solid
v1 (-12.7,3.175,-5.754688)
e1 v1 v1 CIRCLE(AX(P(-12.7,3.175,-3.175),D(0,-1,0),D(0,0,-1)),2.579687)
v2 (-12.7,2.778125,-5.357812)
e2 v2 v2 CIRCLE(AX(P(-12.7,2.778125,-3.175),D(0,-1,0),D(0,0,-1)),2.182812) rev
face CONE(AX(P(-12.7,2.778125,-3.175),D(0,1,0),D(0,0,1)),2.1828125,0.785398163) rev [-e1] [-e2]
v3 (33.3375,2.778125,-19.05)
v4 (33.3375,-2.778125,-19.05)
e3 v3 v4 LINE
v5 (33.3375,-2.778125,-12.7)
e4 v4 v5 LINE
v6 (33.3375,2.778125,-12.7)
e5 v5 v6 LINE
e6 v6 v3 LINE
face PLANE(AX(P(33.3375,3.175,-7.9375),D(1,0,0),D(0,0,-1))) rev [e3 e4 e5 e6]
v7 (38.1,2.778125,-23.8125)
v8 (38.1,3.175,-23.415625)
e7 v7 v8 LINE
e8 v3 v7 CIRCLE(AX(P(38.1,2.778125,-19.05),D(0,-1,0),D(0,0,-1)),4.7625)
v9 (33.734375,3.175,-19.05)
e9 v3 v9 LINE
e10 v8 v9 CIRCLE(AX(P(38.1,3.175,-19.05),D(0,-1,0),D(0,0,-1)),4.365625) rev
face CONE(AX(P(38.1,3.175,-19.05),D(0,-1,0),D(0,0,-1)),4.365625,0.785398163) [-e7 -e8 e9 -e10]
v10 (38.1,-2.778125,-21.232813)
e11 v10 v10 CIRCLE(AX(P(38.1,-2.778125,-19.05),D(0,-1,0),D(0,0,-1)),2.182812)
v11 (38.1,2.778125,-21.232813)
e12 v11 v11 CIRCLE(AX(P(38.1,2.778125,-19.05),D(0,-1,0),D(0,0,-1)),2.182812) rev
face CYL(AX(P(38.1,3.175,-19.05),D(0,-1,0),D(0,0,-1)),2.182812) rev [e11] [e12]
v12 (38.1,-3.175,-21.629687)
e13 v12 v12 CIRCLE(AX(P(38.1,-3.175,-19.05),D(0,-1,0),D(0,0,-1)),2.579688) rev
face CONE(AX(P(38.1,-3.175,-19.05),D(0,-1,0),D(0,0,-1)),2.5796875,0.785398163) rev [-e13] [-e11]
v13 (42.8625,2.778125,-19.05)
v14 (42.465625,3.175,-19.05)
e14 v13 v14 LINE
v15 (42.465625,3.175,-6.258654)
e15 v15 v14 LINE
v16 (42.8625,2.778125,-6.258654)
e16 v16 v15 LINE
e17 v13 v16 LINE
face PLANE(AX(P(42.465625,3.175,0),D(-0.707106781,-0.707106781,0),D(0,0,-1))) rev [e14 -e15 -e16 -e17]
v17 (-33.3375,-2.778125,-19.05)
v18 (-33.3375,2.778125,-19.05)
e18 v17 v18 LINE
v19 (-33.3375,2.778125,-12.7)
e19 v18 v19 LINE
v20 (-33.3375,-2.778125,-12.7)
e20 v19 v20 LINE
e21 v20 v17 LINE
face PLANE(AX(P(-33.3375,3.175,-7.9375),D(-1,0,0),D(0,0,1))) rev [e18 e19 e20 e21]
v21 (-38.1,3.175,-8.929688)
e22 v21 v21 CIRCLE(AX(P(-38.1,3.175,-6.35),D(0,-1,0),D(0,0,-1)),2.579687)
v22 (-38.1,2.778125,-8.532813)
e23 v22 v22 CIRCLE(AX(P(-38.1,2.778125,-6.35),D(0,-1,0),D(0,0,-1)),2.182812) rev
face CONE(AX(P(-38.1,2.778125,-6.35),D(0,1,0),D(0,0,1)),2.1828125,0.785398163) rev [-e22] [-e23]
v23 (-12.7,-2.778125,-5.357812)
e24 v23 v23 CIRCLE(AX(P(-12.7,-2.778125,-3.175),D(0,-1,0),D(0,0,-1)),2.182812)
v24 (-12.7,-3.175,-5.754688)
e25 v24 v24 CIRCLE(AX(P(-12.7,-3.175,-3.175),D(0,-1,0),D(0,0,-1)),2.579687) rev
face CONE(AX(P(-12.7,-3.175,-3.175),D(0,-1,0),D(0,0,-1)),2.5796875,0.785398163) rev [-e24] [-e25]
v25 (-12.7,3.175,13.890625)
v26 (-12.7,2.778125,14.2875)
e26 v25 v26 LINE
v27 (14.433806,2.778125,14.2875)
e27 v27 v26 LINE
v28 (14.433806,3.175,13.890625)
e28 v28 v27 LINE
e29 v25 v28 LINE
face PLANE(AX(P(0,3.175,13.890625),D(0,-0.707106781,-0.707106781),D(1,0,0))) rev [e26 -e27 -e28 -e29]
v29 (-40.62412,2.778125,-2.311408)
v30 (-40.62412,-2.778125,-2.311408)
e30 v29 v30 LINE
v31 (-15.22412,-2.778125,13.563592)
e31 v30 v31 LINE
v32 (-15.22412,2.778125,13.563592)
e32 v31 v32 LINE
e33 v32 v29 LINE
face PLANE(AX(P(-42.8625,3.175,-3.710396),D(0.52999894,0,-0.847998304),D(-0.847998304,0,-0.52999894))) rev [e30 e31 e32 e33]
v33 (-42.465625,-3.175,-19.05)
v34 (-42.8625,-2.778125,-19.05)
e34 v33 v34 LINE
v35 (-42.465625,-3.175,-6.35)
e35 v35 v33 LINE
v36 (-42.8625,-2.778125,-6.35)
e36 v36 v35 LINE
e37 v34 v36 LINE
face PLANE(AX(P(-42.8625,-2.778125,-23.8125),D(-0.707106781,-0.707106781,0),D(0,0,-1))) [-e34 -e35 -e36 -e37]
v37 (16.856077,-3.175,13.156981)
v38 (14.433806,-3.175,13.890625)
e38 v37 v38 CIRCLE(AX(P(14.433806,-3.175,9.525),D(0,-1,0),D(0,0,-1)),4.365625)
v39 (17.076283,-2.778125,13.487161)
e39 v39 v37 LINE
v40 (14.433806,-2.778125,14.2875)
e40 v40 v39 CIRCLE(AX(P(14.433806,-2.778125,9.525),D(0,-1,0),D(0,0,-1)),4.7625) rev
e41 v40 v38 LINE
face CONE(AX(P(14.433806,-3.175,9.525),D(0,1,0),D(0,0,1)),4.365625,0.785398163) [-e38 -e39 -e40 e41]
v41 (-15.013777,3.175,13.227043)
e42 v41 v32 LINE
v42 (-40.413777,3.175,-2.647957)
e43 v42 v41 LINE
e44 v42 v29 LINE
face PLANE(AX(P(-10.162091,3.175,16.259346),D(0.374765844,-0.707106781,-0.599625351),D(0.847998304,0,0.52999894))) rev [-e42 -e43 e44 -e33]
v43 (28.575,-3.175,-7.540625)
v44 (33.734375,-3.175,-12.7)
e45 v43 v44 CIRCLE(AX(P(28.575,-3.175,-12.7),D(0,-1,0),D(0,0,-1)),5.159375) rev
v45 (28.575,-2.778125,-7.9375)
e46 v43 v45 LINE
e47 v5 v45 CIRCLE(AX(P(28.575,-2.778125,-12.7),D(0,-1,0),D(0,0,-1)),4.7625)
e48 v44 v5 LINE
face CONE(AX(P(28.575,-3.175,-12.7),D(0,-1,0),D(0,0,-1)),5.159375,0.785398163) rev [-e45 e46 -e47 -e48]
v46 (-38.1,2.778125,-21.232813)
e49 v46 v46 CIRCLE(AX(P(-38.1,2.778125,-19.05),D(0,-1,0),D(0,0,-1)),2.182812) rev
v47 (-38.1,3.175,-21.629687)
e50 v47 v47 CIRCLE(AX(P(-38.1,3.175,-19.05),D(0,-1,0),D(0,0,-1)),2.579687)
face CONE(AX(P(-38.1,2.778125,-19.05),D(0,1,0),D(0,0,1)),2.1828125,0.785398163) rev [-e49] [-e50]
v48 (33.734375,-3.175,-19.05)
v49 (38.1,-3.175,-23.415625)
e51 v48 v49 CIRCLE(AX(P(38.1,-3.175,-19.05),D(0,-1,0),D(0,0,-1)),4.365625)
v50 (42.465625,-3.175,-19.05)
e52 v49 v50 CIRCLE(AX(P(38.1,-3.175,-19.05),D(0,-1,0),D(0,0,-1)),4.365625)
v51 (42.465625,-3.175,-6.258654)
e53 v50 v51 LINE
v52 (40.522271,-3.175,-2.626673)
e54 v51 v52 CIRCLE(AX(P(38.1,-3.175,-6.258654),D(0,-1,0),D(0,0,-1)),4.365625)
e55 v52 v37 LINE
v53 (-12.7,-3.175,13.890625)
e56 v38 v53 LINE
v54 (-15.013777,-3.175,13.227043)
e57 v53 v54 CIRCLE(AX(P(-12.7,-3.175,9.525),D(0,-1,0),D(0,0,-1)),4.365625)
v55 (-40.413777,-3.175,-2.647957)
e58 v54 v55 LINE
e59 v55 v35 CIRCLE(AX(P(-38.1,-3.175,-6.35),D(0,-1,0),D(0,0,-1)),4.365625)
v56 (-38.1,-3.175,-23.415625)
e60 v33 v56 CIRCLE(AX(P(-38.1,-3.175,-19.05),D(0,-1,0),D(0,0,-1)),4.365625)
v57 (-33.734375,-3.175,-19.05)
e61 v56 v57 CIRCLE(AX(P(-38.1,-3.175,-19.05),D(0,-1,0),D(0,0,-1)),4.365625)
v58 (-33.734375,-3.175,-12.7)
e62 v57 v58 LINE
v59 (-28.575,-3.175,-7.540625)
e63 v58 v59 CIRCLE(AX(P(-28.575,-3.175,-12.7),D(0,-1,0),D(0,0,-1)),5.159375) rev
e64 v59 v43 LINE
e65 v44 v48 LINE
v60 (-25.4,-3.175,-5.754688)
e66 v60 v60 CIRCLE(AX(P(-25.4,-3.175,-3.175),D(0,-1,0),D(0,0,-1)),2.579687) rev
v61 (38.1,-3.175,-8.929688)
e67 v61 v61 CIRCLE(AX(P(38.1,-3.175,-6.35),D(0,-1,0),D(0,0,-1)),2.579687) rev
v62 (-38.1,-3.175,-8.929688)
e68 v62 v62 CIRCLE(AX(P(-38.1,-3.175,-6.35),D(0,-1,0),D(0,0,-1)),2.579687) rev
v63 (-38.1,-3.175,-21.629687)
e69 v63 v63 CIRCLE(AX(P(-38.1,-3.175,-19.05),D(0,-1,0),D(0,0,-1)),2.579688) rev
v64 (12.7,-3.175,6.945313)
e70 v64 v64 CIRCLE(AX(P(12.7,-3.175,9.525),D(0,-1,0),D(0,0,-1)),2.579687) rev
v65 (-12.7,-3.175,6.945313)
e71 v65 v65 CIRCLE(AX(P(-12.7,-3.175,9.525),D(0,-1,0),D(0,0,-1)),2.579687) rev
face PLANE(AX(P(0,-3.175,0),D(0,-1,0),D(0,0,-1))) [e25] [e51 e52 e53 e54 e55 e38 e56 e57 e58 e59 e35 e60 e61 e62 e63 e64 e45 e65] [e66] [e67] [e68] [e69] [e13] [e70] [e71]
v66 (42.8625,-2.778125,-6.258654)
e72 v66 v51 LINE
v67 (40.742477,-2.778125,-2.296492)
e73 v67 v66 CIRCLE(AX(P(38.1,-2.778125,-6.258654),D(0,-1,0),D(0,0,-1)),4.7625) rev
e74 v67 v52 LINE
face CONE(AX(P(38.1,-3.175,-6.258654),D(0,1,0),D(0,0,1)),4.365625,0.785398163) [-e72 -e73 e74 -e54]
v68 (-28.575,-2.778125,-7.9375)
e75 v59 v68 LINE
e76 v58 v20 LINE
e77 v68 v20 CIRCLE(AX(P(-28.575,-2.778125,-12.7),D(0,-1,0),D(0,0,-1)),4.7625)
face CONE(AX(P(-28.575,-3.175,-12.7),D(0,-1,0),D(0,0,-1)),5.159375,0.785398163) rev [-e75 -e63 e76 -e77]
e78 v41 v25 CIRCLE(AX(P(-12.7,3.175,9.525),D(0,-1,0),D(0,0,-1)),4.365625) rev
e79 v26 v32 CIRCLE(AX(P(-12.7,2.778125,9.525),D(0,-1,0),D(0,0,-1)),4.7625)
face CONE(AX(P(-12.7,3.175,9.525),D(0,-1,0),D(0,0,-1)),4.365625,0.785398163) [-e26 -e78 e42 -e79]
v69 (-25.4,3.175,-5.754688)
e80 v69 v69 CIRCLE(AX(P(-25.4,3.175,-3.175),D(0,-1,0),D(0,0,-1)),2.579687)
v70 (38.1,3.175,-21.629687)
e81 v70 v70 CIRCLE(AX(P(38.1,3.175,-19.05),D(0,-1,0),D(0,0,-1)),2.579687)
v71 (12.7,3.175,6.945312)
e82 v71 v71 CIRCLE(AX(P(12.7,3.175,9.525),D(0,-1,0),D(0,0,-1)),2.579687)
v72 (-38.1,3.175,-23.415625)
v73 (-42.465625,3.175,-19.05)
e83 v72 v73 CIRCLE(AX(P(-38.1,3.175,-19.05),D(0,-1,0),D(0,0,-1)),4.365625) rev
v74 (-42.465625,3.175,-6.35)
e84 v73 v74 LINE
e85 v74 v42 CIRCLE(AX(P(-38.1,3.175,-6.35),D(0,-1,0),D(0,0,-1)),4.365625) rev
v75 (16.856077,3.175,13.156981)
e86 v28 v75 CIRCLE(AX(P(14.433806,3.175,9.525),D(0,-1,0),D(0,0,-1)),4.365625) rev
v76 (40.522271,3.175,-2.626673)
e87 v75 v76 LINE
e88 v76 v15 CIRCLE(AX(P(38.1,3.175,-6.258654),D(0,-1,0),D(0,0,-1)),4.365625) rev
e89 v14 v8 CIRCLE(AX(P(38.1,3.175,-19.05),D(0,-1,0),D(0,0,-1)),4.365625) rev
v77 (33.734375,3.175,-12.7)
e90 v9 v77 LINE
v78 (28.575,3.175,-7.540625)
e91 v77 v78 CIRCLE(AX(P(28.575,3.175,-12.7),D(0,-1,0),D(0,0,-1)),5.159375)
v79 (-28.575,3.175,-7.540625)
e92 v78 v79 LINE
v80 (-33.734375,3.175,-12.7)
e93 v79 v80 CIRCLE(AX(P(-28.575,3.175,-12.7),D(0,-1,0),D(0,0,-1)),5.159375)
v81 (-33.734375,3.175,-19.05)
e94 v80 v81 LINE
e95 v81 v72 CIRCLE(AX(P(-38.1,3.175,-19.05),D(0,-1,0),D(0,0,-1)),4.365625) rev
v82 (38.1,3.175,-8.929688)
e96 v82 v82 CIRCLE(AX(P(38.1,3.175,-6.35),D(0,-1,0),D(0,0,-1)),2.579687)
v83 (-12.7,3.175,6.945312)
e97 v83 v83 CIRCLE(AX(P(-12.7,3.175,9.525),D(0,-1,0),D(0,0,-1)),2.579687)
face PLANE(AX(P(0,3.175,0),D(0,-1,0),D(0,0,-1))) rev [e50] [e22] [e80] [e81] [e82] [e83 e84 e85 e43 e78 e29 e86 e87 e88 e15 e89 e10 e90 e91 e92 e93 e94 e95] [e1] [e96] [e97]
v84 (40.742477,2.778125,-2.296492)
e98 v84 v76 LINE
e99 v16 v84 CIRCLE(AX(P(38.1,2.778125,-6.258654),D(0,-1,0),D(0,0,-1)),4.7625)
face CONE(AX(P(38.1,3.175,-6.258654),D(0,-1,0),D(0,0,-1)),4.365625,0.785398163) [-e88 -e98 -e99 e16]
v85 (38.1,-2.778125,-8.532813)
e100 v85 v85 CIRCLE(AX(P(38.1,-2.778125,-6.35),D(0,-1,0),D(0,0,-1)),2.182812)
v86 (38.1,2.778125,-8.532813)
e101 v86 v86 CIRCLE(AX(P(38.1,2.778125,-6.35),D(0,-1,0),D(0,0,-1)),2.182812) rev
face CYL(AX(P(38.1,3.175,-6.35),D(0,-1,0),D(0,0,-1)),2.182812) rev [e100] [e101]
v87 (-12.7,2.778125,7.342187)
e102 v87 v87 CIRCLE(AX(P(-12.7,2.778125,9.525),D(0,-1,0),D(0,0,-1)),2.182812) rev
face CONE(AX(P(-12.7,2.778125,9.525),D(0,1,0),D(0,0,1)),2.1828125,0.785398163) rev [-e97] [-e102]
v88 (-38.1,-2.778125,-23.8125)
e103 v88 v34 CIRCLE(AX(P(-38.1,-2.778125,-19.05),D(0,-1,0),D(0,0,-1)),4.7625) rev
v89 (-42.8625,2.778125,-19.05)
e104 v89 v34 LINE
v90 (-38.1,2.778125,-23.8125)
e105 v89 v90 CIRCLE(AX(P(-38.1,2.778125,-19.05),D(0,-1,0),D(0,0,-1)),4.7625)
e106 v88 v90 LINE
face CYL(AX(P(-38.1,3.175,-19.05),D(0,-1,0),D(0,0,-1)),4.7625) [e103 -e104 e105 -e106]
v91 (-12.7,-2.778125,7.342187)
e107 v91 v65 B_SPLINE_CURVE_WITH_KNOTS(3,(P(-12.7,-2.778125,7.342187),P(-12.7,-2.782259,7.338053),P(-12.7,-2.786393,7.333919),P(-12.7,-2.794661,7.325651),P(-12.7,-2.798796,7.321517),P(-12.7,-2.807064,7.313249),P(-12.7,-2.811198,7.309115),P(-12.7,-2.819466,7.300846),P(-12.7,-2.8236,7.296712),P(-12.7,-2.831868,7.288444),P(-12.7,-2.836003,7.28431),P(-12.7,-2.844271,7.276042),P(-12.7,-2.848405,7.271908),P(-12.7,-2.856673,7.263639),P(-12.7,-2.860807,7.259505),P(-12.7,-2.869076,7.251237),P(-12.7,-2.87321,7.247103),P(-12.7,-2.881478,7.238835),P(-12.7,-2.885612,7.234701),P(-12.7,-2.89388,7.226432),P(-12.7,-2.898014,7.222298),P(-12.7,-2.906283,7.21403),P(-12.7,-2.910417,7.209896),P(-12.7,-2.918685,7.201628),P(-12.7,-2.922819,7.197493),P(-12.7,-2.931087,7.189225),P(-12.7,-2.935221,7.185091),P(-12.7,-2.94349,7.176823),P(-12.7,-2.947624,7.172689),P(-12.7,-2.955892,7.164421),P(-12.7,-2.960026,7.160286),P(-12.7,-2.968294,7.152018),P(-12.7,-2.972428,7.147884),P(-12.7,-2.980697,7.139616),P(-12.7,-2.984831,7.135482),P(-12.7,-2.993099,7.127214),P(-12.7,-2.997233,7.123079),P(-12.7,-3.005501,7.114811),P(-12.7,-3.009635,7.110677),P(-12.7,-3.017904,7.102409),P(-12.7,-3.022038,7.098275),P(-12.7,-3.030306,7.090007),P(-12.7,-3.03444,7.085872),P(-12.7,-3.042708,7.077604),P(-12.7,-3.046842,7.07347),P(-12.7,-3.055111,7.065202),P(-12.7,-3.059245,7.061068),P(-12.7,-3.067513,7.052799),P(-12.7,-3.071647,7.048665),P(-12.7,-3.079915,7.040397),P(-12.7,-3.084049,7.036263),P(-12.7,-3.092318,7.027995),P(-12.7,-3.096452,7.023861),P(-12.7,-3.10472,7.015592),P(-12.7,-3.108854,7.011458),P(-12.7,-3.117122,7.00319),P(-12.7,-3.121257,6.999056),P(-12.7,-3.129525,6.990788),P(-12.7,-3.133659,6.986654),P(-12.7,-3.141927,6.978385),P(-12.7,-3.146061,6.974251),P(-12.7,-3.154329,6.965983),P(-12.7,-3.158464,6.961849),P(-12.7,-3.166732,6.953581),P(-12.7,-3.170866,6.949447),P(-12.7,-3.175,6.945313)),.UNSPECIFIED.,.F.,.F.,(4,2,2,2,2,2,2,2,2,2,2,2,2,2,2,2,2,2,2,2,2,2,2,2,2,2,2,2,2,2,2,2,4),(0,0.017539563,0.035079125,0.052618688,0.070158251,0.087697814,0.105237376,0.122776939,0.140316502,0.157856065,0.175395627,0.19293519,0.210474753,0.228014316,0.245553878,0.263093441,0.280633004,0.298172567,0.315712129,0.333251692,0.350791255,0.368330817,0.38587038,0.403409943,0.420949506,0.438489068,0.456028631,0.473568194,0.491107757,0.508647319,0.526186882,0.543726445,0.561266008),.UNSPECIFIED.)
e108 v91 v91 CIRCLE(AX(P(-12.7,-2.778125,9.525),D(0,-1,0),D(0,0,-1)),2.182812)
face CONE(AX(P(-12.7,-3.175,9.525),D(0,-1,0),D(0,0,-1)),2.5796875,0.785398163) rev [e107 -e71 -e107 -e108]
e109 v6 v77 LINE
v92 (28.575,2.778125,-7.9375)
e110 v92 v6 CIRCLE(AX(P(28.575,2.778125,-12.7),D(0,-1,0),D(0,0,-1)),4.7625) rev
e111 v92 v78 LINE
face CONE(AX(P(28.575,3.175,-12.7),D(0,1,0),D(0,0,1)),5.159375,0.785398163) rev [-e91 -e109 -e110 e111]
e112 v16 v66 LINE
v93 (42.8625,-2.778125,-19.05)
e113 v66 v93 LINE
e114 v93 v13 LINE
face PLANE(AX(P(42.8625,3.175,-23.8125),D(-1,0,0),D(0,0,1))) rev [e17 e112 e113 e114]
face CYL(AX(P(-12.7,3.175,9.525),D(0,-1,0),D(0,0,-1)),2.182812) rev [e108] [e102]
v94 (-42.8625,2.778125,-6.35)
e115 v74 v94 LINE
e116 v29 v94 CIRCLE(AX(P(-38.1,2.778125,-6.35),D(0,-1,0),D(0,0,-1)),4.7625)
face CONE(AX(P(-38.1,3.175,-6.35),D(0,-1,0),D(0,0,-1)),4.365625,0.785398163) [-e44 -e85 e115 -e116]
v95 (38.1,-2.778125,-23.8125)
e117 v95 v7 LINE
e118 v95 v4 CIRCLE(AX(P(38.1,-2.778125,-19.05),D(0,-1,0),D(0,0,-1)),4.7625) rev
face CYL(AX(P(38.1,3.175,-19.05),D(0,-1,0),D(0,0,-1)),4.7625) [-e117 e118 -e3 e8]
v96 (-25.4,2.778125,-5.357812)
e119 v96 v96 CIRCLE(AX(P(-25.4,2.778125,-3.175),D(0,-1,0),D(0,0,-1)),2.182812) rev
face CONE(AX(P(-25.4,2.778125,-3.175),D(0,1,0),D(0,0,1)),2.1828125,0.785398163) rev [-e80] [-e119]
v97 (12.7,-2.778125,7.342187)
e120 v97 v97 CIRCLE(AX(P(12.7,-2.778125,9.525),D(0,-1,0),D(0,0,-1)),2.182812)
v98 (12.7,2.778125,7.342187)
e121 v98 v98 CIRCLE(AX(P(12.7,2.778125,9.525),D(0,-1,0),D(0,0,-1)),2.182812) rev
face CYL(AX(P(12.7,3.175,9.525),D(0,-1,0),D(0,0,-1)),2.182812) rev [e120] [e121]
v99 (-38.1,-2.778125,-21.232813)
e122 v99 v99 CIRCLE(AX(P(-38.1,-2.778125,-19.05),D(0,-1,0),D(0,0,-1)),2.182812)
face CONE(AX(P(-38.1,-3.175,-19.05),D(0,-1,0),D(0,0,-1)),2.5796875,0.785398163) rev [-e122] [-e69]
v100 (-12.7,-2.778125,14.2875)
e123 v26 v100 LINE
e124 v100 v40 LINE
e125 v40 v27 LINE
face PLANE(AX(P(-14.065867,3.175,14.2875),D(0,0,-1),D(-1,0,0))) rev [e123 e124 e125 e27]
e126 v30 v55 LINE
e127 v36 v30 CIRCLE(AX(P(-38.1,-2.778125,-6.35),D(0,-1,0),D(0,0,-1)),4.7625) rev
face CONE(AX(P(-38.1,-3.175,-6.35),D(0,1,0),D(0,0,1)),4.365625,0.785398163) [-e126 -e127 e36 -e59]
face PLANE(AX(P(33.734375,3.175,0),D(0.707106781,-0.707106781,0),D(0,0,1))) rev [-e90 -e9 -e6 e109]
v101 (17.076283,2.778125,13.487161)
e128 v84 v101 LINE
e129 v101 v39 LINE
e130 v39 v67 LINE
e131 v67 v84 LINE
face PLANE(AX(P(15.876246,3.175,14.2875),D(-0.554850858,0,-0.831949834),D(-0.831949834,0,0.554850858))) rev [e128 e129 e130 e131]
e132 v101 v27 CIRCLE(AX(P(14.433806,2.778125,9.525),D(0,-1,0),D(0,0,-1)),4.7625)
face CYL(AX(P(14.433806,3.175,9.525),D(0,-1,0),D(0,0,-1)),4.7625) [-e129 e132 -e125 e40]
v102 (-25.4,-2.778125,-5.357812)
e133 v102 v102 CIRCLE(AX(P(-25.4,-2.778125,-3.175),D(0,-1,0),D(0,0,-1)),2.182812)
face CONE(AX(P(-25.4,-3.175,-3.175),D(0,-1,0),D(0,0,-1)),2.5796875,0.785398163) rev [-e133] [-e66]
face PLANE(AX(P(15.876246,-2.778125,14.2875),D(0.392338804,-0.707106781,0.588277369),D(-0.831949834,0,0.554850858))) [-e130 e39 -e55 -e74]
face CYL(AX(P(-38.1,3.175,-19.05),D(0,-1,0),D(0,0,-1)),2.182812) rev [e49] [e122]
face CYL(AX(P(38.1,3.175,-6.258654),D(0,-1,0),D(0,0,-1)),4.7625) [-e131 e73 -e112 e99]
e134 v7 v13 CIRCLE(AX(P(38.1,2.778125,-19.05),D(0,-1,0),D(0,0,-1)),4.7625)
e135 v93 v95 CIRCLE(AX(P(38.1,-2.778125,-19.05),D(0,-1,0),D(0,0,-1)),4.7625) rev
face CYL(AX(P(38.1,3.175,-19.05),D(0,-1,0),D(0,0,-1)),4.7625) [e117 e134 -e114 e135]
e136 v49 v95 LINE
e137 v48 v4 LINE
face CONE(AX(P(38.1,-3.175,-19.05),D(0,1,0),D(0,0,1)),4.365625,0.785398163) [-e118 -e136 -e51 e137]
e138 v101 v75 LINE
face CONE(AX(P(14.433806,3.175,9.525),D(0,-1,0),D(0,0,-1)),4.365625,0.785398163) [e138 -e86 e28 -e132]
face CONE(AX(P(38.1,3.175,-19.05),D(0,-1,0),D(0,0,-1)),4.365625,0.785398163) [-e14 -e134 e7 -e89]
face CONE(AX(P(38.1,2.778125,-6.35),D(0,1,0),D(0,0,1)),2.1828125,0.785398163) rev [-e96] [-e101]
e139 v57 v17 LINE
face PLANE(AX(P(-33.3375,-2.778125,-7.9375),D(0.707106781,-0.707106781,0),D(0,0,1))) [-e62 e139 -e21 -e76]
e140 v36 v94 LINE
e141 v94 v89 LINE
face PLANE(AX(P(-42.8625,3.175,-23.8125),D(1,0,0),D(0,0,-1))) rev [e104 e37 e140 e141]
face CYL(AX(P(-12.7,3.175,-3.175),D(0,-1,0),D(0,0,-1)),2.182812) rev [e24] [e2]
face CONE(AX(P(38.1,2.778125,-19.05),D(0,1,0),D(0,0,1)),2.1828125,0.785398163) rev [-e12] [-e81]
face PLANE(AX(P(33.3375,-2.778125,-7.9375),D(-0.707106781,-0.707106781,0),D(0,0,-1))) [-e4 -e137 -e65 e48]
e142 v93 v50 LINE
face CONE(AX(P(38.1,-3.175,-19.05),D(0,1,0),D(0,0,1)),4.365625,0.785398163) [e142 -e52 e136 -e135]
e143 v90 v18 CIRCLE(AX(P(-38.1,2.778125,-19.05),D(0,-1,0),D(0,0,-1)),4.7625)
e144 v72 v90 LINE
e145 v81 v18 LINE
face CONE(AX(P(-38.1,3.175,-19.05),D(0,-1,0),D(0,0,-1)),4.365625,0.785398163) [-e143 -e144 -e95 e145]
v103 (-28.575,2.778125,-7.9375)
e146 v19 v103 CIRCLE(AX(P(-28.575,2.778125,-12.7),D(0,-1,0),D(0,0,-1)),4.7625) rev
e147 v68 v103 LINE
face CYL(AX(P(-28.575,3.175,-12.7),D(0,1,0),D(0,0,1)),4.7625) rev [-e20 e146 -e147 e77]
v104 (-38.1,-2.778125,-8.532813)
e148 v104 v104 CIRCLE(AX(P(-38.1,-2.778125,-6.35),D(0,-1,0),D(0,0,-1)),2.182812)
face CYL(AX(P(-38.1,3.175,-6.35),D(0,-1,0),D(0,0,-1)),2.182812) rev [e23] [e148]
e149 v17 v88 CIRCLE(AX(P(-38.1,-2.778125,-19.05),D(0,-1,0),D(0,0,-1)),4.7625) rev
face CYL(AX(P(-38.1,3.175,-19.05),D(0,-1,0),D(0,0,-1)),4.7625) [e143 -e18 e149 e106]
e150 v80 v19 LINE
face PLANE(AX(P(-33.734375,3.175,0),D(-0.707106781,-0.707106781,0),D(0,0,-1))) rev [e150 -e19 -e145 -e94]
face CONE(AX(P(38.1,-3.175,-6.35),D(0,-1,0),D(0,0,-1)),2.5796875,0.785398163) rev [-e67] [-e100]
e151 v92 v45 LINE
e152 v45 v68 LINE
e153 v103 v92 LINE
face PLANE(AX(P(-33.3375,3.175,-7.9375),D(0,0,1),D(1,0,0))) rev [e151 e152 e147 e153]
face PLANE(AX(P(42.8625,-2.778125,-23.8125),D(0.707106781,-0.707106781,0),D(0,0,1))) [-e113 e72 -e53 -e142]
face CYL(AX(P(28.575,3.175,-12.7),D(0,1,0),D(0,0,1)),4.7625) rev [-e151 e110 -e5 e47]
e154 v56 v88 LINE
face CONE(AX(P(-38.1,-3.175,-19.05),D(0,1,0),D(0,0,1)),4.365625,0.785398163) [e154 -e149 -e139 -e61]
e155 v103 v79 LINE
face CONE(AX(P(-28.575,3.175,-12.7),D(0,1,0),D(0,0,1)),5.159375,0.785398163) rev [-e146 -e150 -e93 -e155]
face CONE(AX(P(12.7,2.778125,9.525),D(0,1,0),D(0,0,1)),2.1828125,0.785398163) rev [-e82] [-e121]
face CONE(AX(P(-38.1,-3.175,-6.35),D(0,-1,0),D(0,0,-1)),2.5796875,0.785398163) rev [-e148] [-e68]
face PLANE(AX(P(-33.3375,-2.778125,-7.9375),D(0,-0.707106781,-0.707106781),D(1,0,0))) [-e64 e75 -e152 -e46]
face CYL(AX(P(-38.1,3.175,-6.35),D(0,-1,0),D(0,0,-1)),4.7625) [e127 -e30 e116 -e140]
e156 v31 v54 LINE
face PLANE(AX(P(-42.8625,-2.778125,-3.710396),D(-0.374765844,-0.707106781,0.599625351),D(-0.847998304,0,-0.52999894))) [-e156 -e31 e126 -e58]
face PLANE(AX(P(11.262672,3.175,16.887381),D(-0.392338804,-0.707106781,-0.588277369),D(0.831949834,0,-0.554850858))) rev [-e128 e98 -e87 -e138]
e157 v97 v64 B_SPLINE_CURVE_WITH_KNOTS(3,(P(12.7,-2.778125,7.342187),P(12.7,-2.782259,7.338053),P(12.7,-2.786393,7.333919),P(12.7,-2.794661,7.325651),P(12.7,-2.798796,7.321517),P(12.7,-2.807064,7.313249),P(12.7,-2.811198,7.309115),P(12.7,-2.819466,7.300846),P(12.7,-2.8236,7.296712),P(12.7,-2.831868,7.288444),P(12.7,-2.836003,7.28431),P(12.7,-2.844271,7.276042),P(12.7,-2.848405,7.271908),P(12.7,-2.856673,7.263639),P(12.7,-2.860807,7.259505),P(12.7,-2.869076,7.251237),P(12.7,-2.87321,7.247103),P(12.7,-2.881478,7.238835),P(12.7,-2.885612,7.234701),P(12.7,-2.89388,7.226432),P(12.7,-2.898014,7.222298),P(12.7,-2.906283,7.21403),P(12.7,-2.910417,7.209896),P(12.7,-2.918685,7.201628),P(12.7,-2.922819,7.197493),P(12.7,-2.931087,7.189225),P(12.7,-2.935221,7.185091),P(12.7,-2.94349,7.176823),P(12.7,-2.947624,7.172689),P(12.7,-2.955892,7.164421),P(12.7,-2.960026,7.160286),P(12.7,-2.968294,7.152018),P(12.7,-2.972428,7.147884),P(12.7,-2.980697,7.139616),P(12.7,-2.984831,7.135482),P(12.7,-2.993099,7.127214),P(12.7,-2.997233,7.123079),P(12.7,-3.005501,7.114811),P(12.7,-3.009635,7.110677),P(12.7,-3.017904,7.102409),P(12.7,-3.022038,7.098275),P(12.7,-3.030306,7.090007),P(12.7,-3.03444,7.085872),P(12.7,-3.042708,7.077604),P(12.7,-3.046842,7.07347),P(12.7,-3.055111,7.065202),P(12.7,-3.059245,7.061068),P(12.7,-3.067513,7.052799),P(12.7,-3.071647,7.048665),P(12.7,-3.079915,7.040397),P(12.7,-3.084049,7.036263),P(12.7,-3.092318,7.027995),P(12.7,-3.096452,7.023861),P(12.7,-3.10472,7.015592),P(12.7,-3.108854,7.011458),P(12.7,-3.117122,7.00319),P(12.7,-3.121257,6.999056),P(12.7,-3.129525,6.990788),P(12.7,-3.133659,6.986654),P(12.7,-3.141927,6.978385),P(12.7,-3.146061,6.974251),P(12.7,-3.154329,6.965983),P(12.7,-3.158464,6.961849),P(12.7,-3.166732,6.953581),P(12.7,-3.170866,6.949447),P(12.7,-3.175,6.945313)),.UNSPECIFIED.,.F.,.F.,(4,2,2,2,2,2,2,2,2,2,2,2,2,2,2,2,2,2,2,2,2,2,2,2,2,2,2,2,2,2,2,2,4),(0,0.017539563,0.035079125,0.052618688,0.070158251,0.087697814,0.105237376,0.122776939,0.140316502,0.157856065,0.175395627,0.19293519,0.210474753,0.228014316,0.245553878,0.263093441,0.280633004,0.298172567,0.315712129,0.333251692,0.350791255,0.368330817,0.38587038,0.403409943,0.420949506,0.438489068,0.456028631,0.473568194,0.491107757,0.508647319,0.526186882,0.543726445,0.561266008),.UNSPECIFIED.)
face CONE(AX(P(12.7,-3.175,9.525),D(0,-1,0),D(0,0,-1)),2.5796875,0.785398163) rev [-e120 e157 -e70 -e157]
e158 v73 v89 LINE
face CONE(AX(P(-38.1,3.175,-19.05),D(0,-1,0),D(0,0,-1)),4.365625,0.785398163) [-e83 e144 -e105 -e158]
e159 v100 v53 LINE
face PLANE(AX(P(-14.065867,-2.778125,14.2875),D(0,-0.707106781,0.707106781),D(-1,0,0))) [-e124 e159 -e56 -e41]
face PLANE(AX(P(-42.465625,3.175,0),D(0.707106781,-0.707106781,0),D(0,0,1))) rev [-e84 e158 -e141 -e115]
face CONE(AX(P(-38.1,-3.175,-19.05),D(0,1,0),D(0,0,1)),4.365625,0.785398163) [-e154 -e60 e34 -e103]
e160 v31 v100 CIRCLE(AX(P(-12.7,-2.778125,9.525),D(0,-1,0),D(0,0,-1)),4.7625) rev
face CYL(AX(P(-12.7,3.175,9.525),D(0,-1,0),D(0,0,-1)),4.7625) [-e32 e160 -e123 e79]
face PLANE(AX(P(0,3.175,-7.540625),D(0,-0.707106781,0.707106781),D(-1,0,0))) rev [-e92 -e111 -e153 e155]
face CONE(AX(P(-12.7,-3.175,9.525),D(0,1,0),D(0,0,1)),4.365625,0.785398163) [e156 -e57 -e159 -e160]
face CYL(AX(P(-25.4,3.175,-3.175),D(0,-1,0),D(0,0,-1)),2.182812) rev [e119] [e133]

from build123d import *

# Parameters (mm, degrees)
SKETCH1_R           = 2.1828125
BOSS_EXTRUDE1_DEPTH = 3.175
FILLET1_R           = 4.7625
CHAMFER1_SIZE       = 0.396875


with BuildPart() as part:
    # Sketch1 → Boss-Extrude1 (new, symmetric)
    with BuildSketch(Plane(origin=(0, 0, 0), x_dir=(1, 0, 0), z_dir=(0, 1, 0))):
        Polygon((-33.3375, 7.9375), (-33.3375, 23.8125), (-42.8625, 23.8125), (-42.8625, 3.710395607), (-14.065867028, -14.2875), (15.876245853, -14.2875), (42.8625, 3.710395607), (42.8625, 23.8125), (33.3375, 23.8125), (33.3375, 7.9375), align=None)
        with Locations(Location((-38.1, 6.35, 0), (0, 0, 270))):
            Circle(SKETCH1_R, mode=Mode.SUBTRACT)
        with Locations(Location((-38.1, 19.05, 0), (0, 0, 270))):
            Circle(SKETCH1_R, mode=Mode.SUBTRACT)
        with Locations(Location((38.1, 19.05, 0), (0, 0, 270))):
            Circle(SKETCH1_R, mode=Mode.SUBTRACT)
        with Locations(Location((38.1, 6.35, 0), (0, 0, 270))):
            Circle(SKETCH1_R, mode=Mode.SUBTRACT)
        with Locations(Location((-25.4, 3.175, 0), (0, 0, 270))):
            Circle(SKETCH1_R, mode=Mode.SUBTRACT)
        with Locations(Location((-12.7, 3.175, 0), (0, 0, 270))):
            Circle(SKETCH1_R, mode=Mode.SUBTRACT)
        with Locations(Location((-12.7, -9.525, 0), (0, 0, 270))):
            Circle(SKETCH1_R, mode=Mode.SUBTRACT)
        with Locations(Location((12.7, -9.525, 0), (0, 0, 270))):
            Circle(SKETCH1_R, mode=Mode.SUBTRACT)
    extrude(amount=BOSS_EXTRUDE1_DEPTH, both=True)

    # Fillet1
    fillet1_edges = [part.edges().sort_by_distance(p)[0] for p in [
        (42.8625, 0, -3.710395607),
        (15.876245853, 0, 14.2875),
        (-14.065867028, 0, 14.2875),
        (-42.8625, 0, -3.710395607),
        (-33.3375, 0, -23.8125),
        (-42.8625, 0, -23.8125),
        (42.8625, 0, -23.8125),
        (33.3375, 0, -23.8125),
        (33.3375, 0, -7.9375),
        (-33.3375, 0, -7.9375),
    ]]
    fillet(fillet1_edges, radius=FILLET1_R - 0.0001)  # a hair under: the kernel refuses the full size

    # Chamfer1
    chamfer1_edges = [part.edges().sort_by_distance(p)[0] for p in [
        (-38.1, -3.175, -8.5328125),
        (-38.1, 3.175, -8.5328125),
        (-38.1, -3.175, -21.2328125),
        (-38.1, 3.175, -21.2328125),
        (38.1, -3.175, -21.2328125),
        (38.1, 3.175, -21.2328125),
        (38.1, -3.175, -8.5328125),
        (38.1, 3.175, -8.5328125),
        (-12.7, -3.175, -5.3578125),
        (-12.7, 3.175, -5.3578125),
        (-25.4, -3.175, -5.3578125),
        (-25.4, 3.175, -5.3578125),
        (12.7, -3.175, 7.3421875),
        (12.7, 3.175, 7.3421875),
        (-12.7, -3.175, 7.3421875),
        (-12.7, 3.175, 7.3421875),
        (42.8625, -3.175, -12.654350033),
        (42.8625, 3.175, -12.654350033),
        (28.909389934, -3.175, 5.595327855),
        (0.866903869, -3.175, 14.2875),
        (-27.924131292, -3.175, 5.626084835),
        (-42.8625, -3.175, -12.700022288),
        (-33.3375, -3.175, -15.875),
        (0, -3.175, -7.9375),
        (33.3375, -3.175, -15.875),
        (34.732374665, -3.175, -22.417625335),
        (41.467625335, -3.175, -22.417625335),
        (-41.467625335, -3.175, -22.417625335),
        (-34.732374665, -3.175, -22.417625335),
        (-42.265497353, -3.175, -4.041282917),
        (-14.01293908, -3.175, 14.102951029),
        (15.814317137, -3.175, 14.083030095),
        (42.299190555, -3.175, -4.011804065),
        (28.909389934, 3.175, 5.595327855),
        (33.3375, 3.175, -15.875),
        (0, 3.175, -7.9375),
        (-33.3375, 3.175, -15.875),
        (-42.8625, 3.175, -12.700022288),
        (-27.924131292, 3.175, 5.626084835),
        (0.866903869, 3.175, 14.2875),
        (34.732374665, 3.175, -22.417625335),
        (41.467625335, 3.175, -22.417625335),
        (-41.467625335, 3.175, -22.417625335),
        (-34.732374665, 3.175, -22.417625335),
        (-42.265497353, 3.175, -4.041282917),
        (-14.01293908, 3.175, 14.102951029),
        (15.814317137, 3.175, 14.083030095),
        (42.299190555, 3.175, -4.011804065),
        (31.942625335, -3.175, -9.332374665),
        (31.942625335, 3.175, -9.332374665),
        (-31.942625335, -3.175, -9.332374665),
        (-31.942625335, 3.175, -9.332374665),
    ]]
    chamfer(chamfer1_edges, length=CHAMFER1_SIZE)


solid = part.part
